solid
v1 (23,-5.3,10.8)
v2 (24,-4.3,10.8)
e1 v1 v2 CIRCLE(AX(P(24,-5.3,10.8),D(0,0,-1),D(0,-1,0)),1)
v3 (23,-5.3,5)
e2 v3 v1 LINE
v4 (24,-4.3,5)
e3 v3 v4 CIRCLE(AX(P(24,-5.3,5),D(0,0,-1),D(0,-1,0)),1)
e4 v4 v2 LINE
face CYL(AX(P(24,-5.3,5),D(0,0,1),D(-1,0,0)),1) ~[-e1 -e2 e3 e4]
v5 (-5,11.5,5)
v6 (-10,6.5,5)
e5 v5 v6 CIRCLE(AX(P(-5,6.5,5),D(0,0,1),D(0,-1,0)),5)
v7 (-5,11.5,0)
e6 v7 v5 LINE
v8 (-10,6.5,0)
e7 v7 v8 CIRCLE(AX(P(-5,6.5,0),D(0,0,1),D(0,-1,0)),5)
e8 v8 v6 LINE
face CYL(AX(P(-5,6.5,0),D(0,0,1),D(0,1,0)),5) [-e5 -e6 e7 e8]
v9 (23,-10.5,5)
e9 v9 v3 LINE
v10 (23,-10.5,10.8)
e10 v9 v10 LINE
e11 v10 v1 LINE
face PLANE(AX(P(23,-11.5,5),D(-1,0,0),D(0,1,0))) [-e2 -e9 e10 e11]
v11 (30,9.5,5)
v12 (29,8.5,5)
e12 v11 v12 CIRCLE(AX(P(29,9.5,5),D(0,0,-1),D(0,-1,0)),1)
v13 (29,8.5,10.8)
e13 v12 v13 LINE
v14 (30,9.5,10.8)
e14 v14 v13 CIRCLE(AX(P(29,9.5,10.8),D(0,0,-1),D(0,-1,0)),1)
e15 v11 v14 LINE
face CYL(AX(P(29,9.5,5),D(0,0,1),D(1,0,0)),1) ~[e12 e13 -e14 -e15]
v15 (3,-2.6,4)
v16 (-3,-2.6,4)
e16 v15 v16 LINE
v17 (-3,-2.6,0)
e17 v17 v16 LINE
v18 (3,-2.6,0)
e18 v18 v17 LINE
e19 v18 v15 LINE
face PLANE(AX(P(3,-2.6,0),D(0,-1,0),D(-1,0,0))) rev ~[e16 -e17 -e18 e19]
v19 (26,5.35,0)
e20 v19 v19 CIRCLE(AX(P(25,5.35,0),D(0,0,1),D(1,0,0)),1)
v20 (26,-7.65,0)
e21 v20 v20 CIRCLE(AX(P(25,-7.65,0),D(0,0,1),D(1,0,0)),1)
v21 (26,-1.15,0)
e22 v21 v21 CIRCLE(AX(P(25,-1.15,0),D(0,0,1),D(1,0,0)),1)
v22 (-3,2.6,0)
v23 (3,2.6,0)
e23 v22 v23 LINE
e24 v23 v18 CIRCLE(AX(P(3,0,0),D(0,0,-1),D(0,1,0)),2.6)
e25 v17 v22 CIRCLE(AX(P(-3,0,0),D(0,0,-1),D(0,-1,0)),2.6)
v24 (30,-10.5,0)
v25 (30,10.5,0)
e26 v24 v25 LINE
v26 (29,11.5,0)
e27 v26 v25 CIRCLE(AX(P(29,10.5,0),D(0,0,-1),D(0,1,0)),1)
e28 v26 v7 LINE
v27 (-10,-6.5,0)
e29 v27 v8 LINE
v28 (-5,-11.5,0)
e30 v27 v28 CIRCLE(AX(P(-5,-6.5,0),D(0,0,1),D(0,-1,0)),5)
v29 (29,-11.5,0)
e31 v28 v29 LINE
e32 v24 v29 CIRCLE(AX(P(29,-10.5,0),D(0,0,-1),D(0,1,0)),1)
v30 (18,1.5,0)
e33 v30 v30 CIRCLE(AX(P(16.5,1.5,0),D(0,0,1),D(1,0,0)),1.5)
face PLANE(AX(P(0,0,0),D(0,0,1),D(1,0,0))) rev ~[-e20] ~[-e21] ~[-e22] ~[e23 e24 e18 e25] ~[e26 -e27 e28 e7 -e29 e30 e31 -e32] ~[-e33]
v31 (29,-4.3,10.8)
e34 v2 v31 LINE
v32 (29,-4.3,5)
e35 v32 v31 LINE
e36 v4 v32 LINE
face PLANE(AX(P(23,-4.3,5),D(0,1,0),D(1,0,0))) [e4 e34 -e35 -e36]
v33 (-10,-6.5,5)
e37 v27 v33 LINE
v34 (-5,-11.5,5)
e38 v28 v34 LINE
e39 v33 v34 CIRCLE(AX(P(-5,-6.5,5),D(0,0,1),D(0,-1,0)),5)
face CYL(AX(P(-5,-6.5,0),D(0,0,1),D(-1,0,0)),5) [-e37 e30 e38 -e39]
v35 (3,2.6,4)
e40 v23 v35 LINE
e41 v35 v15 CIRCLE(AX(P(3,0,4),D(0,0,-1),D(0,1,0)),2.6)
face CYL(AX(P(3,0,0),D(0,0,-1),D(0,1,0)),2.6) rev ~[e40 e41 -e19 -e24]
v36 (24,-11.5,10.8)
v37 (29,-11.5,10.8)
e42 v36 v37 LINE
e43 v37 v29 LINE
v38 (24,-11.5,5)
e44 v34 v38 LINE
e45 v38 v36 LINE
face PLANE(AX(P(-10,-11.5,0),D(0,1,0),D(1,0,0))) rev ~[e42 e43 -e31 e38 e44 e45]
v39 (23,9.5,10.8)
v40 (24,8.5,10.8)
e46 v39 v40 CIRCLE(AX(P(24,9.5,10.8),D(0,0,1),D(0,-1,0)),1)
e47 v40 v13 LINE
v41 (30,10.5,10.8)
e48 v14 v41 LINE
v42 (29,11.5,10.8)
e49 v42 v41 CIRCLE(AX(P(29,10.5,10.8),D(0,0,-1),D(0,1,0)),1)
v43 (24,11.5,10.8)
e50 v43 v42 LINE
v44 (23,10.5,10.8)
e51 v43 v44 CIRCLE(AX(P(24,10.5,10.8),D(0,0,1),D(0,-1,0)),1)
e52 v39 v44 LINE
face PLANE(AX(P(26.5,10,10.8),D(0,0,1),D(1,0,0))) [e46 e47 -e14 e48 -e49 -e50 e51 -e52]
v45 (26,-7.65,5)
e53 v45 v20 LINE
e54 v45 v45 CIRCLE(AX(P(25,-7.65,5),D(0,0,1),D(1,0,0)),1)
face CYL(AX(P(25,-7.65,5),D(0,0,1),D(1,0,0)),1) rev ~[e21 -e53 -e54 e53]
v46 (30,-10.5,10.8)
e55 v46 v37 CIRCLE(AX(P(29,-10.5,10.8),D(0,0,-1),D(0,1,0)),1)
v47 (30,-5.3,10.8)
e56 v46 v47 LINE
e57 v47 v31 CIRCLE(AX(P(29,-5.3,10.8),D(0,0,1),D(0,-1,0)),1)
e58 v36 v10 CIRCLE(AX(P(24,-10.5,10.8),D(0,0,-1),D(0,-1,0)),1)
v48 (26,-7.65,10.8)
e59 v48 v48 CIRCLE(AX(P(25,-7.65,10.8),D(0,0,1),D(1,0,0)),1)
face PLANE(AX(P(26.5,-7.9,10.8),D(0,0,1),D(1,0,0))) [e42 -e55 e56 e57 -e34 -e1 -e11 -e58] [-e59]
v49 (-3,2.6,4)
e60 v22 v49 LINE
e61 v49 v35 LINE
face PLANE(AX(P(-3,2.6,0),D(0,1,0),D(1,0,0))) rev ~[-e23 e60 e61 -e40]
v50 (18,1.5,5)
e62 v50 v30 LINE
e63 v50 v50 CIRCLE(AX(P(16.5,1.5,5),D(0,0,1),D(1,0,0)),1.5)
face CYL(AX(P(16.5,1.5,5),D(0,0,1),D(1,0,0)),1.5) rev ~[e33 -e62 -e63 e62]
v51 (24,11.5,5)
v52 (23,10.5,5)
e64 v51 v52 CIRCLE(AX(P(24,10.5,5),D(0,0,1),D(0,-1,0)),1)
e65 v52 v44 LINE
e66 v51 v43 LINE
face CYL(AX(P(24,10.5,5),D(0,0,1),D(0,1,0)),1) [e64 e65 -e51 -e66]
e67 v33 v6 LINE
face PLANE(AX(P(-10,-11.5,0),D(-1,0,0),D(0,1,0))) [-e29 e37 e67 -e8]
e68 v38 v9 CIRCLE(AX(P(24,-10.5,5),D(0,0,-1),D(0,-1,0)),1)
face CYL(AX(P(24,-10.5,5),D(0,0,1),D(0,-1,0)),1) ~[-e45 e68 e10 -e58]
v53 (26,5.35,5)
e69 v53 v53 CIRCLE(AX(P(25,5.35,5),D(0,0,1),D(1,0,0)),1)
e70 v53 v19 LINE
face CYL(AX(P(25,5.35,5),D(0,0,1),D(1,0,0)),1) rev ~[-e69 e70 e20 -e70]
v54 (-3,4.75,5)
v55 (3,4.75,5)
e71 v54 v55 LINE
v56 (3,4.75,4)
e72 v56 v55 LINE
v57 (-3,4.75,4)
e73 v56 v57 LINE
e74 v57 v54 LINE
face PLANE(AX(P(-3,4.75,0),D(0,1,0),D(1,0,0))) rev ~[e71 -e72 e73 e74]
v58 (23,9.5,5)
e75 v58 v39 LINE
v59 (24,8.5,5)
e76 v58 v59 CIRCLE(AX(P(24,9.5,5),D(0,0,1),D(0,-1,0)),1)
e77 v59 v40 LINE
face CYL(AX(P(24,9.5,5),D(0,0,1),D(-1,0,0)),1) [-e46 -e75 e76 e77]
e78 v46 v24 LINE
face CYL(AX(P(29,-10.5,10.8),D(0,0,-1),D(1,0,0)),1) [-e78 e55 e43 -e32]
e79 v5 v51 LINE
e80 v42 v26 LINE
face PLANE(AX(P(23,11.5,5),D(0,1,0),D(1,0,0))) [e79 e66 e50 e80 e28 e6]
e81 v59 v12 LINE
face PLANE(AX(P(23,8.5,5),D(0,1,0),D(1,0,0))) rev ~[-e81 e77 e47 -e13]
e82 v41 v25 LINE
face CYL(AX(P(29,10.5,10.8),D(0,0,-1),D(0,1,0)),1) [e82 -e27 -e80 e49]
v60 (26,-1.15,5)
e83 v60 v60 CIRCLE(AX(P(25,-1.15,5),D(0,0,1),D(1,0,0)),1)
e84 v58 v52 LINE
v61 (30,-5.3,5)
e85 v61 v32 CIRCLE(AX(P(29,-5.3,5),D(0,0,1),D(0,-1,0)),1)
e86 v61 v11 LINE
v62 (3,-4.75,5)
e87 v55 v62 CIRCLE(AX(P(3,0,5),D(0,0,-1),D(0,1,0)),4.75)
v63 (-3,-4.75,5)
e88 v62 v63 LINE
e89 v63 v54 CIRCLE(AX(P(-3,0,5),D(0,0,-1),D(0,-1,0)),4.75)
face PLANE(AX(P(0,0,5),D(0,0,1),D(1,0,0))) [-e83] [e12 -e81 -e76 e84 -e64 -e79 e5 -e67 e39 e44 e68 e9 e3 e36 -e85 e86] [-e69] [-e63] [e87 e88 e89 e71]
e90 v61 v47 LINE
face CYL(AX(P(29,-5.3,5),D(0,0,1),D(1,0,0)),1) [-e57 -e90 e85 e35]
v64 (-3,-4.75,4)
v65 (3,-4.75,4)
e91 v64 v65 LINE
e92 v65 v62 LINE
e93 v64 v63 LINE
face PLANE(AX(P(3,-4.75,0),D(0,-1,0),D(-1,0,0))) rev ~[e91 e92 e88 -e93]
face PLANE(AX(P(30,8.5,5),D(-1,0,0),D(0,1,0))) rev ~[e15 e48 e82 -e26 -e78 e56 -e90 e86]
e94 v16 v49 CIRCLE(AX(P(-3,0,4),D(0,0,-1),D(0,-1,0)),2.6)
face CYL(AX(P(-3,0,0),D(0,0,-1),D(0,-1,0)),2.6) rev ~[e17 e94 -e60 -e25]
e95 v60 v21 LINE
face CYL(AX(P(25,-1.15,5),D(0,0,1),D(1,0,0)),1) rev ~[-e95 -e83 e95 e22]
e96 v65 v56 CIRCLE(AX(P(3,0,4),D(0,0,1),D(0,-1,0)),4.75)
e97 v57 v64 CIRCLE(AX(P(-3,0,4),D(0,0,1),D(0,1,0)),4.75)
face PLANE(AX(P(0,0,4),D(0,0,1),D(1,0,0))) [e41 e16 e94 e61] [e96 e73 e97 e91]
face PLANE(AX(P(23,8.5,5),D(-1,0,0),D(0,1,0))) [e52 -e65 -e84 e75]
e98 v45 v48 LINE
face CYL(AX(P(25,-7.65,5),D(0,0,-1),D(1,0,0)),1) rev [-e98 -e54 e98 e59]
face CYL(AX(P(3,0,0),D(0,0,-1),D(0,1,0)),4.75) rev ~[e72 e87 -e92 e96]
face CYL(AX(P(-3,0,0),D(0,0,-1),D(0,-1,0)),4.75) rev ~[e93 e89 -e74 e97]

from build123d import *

# Parameters (mm, degrees)
F0_W     = 20
F0_H     = 23
F1_DEPTH = 5
F2_W     = 7
F2_H     = 3
F2_H_2   = 7.2
F2_R     = 1
F3_DEPTH = 5.8
F4_DEPTH = 5.001
F5_R     = 5
F6_R     = 1
F7_R     = 1
F8_DEPTH = 4
F2_R_2   = 1.5
F9_DEPTH = 5.001


with BuildPart() as f1:
    # F0 (on Top) → F1 (new body)
    with BuildSketch(Plane.XY):
        Rectangle(F0_W, F0_H)
        with BuildLine():
            Line((-3, 4.75), (3, 4.75))
            ThreePointArc((3, 4.75), (7.75, 0), (3, -4.75))
            Line((3, -4.75), (-3, -4.75))
            ThreePointArc((-3, -4.75), (-7.75, 0), (-3, 4.75))
        make_face(mode=Mode.SUBTRACT)
        with Locations((20, 0)):
            Rectangle(F0_W, F0_H)
    extrude(amount=F1_DEPTH)

    # F2 (on face) → F3 (join)
    with BuildSketch(Plane.XY.offset(5)):
        with Locations((26.5, 10)):
            Rectangle(F2_W, F2_H)
        with Locations((26.5, -7.9)):
            Rectangle(F2_W, F2_H_2)
        with Locations((25, -7.65)):
            Circle(F2_R, mode=Mode.SUBTRACT)
    extrude(amount=F3_DEPTH)

    # F2 (on face) → F4 (cut, through all)
    with BuildSketch(Plane.XY.offset(5)):
        with Locations((25, 5.35)):
            Circle(F2_R)
        with Locations((25, -1.15)):
            Circle(F2_R)
        with Locations((25, -7.65)):
            Circle(F2_R)
    extrude(amount=-F4_DEPTH, mode=Mode.SUBTRACT)

    # F5
    f5_edges = [f1.edges().sort_by_distance(p)[0] for p in [
        (-10, -11.5, 2.5),
        (-10, 11.5, 2.5),
    ]]
    fillet(f5_edges, radius=F5_R)

    # F6
    f6_edges = [f1.edges().sort_by_distance(p)[0] for p in [
        (30, -11.5, 5.4),
        (30, 11.5, 5.4),
    ]]
    fillet(f6_edges, radius=F6_R)

    # F7
    f7_edges = [f1.edges().sort_by_distance(p)[0] for p in [
        (23, 8.5, 7.9),
        (23, -4.3, 7.9),
        (30, -4.3, 7.9),
        (30, 8.5, 7.9),
        (23, -11.5, 7.9),
        (23, 11.5, 7.9),
    ]]
    fillet(f7_edges, radius=F7_R)

    # F0 (on Top) → F8 (join)
    with BuildSketch(Plane.XY):
        with BuildLine():
            ThreePointArc((3, -4.75), (7.75, 0), (3, 4.75))
            Line((3, 4.75), (-3, 4.75))
            ThreePointArc((-3, 4.75), (-7.75, 0), (-3, -4.75))
            Line((-3, -4.75), (3, -4.75))
        make_face()
        with BuildLine():
            Line((-3, 2.6), (3, 2.6))
            ThreePointArc((3, 2.6), (5.6, 0), (3, -2.6))
            Line((3, -2.6), (-3, -2.6))
            ThreePointArc((-3, -2.6), (-5.6, 0), (-3, 2.6))
        make_face(mode=Mode.SUBTRACT)
    extrude(amount=F8_DEPTH)

    # F2 (on face) → F9 (cut, through all)
    with BuildSketch(Plane.XY.offset(5)):
        with Locations((16.5, 1.5)):
            Circle(F2_R_2)
    extrude(amount=-F9_DEPTH, mode=Mode.SUBTRACT)


solid = f1.part
